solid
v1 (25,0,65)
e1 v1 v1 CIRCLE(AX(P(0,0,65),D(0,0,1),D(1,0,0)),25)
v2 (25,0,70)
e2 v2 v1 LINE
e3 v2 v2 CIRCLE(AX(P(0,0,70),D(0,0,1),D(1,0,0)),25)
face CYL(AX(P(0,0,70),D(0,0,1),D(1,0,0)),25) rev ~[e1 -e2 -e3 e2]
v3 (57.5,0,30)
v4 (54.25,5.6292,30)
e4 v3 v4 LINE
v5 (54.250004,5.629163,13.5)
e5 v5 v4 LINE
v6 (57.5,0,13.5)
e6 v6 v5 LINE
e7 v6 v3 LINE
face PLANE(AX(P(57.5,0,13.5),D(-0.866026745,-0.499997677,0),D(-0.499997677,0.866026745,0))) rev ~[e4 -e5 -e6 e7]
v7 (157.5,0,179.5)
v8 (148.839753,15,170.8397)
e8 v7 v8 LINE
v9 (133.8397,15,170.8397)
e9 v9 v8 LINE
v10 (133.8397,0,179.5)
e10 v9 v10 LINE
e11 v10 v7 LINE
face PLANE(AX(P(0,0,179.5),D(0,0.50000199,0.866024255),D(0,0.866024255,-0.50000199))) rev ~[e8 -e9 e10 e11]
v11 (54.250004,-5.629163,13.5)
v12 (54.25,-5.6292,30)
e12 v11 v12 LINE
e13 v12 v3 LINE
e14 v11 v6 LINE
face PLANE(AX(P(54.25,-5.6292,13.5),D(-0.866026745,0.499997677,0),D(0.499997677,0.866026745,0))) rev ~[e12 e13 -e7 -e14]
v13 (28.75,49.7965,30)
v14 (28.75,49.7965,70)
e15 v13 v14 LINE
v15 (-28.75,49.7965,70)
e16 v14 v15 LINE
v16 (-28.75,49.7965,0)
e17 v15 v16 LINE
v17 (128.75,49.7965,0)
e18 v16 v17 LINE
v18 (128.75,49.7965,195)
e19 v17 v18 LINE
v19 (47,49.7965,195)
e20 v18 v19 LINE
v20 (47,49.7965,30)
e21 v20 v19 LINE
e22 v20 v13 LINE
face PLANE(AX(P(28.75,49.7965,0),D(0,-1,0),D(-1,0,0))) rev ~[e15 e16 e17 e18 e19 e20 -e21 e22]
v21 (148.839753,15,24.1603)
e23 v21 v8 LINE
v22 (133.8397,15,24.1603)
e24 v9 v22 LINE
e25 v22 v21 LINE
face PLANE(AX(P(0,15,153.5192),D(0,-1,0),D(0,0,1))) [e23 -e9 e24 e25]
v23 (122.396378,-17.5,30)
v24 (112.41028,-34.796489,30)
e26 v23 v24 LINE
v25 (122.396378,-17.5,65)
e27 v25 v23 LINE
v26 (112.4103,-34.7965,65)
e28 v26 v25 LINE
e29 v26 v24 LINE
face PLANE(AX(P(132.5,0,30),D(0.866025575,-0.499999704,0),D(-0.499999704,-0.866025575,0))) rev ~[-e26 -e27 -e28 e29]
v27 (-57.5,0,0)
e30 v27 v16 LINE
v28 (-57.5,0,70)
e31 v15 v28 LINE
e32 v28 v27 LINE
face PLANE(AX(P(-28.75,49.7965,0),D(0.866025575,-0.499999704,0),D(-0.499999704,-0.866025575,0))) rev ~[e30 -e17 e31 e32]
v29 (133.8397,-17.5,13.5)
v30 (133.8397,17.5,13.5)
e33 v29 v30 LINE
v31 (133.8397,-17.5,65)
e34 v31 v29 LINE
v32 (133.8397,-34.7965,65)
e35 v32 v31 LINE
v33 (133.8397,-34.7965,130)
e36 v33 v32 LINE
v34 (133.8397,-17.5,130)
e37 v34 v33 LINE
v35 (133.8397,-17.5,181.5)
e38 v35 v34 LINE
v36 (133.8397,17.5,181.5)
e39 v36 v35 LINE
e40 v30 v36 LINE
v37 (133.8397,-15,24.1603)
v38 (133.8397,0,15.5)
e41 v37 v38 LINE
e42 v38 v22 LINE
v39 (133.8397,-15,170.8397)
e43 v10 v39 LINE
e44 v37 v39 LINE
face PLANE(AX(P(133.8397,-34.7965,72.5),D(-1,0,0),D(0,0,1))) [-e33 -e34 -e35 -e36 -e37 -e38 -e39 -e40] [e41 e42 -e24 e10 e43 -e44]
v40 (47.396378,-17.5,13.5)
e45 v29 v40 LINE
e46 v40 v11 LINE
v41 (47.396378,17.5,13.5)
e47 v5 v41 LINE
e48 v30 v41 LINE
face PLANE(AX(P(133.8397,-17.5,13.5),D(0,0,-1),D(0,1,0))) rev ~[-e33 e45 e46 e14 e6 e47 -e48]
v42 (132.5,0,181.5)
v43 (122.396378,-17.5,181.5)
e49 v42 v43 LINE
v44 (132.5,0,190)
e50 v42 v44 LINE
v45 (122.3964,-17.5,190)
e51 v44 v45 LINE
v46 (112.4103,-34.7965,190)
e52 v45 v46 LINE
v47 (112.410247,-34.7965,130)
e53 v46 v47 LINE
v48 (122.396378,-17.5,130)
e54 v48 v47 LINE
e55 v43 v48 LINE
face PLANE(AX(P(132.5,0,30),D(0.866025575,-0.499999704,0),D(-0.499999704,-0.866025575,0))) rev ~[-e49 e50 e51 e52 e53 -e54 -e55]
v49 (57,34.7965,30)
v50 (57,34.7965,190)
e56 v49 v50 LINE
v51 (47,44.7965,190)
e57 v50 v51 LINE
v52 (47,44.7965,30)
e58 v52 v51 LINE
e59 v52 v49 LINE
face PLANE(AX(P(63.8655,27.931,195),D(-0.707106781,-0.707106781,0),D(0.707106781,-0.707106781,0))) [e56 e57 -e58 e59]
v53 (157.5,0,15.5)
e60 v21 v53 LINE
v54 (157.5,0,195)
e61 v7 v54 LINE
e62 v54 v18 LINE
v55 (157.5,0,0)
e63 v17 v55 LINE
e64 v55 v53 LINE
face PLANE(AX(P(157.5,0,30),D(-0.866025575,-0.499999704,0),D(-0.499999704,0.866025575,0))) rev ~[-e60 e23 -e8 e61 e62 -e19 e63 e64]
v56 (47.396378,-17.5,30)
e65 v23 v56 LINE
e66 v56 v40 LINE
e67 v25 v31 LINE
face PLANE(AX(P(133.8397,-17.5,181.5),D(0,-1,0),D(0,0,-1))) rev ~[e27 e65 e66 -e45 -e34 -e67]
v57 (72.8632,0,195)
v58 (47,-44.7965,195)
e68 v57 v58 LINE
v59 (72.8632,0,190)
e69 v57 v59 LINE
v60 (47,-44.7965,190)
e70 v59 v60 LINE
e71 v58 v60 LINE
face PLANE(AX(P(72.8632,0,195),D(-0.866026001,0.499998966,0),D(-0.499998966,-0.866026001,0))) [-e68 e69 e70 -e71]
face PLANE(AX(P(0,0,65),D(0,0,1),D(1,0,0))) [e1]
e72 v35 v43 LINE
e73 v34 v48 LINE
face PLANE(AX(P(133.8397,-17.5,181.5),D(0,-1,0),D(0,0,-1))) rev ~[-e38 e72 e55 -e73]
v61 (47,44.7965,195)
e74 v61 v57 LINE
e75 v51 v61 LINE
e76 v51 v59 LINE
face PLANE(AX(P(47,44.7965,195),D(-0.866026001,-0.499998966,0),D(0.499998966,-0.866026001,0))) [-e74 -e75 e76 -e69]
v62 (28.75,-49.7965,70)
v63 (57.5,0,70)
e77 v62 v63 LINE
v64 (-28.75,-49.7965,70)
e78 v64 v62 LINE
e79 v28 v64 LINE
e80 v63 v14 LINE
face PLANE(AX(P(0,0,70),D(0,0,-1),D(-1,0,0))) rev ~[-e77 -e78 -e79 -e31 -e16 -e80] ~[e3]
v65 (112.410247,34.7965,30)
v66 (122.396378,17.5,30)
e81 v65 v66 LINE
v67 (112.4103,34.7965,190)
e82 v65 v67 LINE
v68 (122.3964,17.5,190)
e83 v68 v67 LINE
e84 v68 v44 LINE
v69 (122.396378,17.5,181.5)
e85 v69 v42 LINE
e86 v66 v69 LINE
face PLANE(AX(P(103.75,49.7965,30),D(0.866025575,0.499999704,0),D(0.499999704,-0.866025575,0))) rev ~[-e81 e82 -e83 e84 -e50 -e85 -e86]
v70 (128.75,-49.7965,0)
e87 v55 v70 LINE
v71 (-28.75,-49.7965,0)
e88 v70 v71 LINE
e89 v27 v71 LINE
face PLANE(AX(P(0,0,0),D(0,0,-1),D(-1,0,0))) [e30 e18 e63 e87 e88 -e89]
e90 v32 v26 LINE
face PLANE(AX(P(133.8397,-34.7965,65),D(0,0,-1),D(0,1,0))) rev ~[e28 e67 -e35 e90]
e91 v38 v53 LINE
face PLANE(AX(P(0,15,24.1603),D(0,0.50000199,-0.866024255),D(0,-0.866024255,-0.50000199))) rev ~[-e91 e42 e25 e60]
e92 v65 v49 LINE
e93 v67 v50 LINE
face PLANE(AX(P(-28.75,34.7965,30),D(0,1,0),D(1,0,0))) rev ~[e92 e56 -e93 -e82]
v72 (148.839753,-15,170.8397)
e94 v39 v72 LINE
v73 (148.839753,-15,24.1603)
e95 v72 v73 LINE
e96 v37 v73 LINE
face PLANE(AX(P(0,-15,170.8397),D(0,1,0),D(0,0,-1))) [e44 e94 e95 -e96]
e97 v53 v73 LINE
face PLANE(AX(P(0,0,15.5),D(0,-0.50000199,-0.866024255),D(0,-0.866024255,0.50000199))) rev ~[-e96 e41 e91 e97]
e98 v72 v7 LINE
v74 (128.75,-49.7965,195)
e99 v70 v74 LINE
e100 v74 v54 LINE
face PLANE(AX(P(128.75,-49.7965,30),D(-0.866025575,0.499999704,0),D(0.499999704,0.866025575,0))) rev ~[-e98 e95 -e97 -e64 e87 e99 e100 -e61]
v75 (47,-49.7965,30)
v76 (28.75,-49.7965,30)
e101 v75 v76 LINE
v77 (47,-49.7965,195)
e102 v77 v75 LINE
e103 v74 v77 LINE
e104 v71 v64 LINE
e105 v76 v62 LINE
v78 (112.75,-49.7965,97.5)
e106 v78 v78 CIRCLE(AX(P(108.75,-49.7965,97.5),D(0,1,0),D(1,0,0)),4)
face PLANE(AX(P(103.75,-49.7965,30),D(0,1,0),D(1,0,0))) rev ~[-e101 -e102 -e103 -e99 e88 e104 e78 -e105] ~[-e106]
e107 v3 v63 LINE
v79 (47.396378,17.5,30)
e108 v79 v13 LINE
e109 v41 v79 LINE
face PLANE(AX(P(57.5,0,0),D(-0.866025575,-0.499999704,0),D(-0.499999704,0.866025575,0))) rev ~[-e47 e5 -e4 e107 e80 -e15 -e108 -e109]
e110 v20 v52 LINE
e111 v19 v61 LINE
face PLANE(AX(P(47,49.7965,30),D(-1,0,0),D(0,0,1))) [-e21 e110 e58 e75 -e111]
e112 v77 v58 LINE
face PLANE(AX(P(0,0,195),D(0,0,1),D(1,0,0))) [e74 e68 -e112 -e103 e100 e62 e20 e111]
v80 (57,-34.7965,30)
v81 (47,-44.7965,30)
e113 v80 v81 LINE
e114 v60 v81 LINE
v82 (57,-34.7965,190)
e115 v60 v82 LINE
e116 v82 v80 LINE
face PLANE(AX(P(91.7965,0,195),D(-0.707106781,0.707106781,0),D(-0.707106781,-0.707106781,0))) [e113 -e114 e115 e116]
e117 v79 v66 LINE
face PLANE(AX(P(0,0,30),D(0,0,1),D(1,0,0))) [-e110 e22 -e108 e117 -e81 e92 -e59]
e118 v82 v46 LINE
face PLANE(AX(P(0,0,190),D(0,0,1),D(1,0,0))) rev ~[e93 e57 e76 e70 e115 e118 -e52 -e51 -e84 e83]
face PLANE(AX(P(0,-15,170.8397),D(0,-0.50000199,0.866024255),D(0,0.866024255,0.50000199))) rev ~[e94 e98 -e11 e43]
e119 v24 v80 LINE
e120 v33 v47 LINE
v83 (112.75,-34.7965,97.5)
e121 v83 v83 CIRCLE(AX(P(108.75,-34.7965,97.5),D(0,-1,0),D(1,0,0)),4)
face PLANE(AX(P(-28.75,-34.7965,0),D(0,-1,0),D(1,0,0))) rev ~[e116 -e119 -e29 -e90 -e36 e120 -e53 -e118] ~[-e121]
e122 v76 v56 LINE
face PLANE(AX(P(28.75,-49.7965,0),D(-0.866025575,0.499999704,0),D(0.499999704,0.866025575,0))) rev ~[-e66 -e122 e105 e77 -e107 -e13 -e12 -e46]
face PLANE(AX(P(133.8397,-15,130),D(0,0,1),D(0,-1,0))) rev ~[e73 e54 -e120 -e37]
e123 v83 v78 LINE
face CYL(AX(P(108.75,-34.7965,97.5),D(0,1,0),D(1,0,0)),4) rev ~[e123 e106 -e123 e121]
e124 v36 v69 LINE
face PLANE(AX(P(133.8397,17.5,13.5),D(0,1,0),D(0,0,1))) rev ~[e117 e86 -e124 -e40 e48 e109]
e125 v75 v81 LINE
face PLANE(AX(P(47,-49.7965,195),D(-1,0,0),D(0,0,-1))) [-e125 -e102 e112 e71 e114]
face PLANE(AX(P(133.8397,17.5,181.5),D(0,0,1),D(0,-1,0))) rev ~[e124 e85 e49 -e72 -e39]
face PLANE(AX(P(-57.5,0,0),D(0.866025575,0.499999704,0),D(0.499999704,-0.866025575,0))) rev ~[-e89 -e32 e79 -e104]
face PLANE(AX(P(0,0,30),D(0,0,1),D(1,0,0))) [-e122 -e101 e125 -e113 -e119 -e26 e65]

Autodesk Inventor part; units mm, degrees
ref_plane "YZ Plane" through (0, 0, 0) normal (1, 0, 0) x (0, 1, 0)
ref_plane "XZ Plane" through (0, 0, 0) normal (0, 1, 0) x (-1, 0, 0)
ref_plane "XY Plane" through (0, 0, 0) normal (0, 0, 1) x (1, 0, 0)
sketch "Sketch7" plane through (0, 0, 0) normal (0, 0, 1) x (1, 0, 0)
  line L0 (-57.5, 0) -> (-28.75, 49.7965)
  line L1 (-28.75, 49.7965) -> (28.75, 49.7965)
  line L2 (28.75, 49.7965) -> (57.5, 0)
  line L3 (57.5, 0) -> (28.75, -49.7965)
  line L4 (28.75, -49.7965) -> (-28.75, -49.7965)
  line L5 (-28.75, -49.7965) -> (-57.5, 0)
  circle A0 centre (0, 0) radius 22.5
  circle A1 centre (-51, 0) radius 2.5
  circle A2 centre (-25.5, -44.1673) radius 2.5
  circle A3 centre (25.5, -44.1673) radius 2.5
  circle A4 centre (51, 0) radius 2.5
  circle A5 centre (25.5, 44.1673) radius 2.5
  circle A6 centre (-25.5, 44.1673) radius 2.5
  line L6 (28.75, 49.7965) -> (157.5, 49.7965)
  line L7 (157.5, 49.7965) -> (157.5, -49.7965)
  line L8 (157.5, -49.7965) -> (28.75, -49.7965)
  dimension "d34" = 115
  dimension "d35" = 45
  dimension "d36" = 5
  dimension "d37" = 51
  dimension "d40" = 360
  dimension "d42" = 100
extrude "Extrusion7" add sketch "Sketch7" along normal blind 30
sketch "Sketch9" plane through (0, 0, 30) normal (0, 0, 1) x (1, 0, 0)
  line L0 (157.5, -49.7965) -> (157.5, 49.7965) projected
  line L1 (157.5, 0) -> (128.75, -49.7965)
  line L2 (128.75, -49.7965) -> (71.25, -49.7965)
  line L3 (71.25, -49.7965) -> (42.5, 0)
  line L4 (42.5, 0) -> (71.25, 49.7965)
  line L5 (71.25, 49.7965) -> (128.75, 49.7965)
  line L6 (128.75, 49.7965) -> (157.5, 0)
  line L7 (157.5, 49.7965) -> (-28.75, 49.7965) projected
  line L8 (-28.75, -49.7965) -> (157.5, -49.7965) projected
  line L9 (128.75, 49.7965) -> (157.5, 49.7965)
  line L10 (157.5, 49.7965) -> (157.5, 0)
  line L11 (157.5, 0) -> (157.5, -49.7965)
  line L12 (157.5, -49.7965) -> (128.75, -49.7965)
  point P0 (0, 0)
  point P1 (100, 0)
  point P2 (100, 49.7965)
  point P3 (100, -49.7965)
extrude "Extrusion8" cut sketch "Sketch9" against normal through all contours L8 L1 L0 | L6 L7 L0
sketch "Sketch10" plane through (0, 0, 30) normal (0, 0, 1) x (1, 0, 0)
  line L0 (157.5, 0) -> (128.75, 49.7965) projected
  line L1 (128.75, -49.7965) -> (157.5, 0) projected
  line L2 (-28.75, -49.7965) -> (128.75, -49.7965) projected
  line L3 (128.75, 49.7965) -> (-28.75, 49.7965) projected
  line L4 (128.75, 49.7965) -> (103.75, 49.7965)
  line L5 (128.75, 49.7965) -> (-28.75, 49.7965) projected
  line L6 (103.75, 49.7965) -> (132.5, 0)
  line L7 (132.5, 0) -> (103.75, -49.7965)
  line L8 (103.75, -49.7965) -> (128.75, -49.7965)
  point P0 (0, 0)
  dimension "d47" = 25
extrude "Extrusion9" add sketch "Sketch10" along normal blind 165
sketch "Sketch11" plane through (0, 0, 0) normal (1, 0, 0) x (0, 1, 0)
  line L0 (15, 179.5) -> (-15, 179.5)
  line L1 (-15, 179.5) -> (-15, 15.5)
  line L2 (-15, 15.5) -> (15, 15.5)
  line L3 (15, 15.5) -> (15, 179.5)
  line L4 (49.7965, 195) -> (49.7965, 0) projected
  line L5 (0, 179.5) -> (15, 170.8397)
  line L6 (15, 170.8397) -> (15, 153.5192)
  line L7 (15, 153.5192) -> (0, 144.859)
  line L8 (0, 144.859) -> (-15, 153.5192)
  line L9 (-15, 153.5192) -> (-15, 170.8397)
  line L10 (-15, 170.8397) -> (0, 179.5)
  line L11 (0, 15.5) -> (-15, 24.1603)
  line L12 (-15, 24.1603) -> (-15, 41.4808)
  line L13 (-15, 41.4808) -> (0, 50.141)
  line L14 (0, 50.141) -> (15, 41.4808)
  line L15 (15, 41.4808) -> (15, 24.1603)
  line L16 (15, 24.1603) -> (0, 15.5)
  line L17 (0, 179.5) -> (15, 179.5)
  line L18 (15, 179.5) -> (15, 170.8397)
  line L19 (0, 179.5) -> (-15, 179.5)
  line L20 (-15, 179.5) -> (-15, 170.8397)
  line L21 (-15, 24.1603) -> (-15, 15.5)
  line L22 (15, 15.5) -> (15, 24.1603)
  line L23 (0, 15.5) -> (15, 15.5)
  point P0 (0, 0)
  point P1 (15, 97.5)
  point P2 (49.7965, 97.5)
  point P3 (0, 195)
  point P4 (0, 162.1795)
  point P5 (0, 32.8205)
  dimension "d50" = 164
  dimension "d51" = 30
extrude "Extrusion10" cut sketch "Sketch11" along normal through all contours L5 L3 L7 L8 L1 L10 | L3 L14 L13 L1 L8 L7 | L3 L16 L11 L1 L13 L14
sketch "Sketch12" plane through (-28.75, -49.7965, 0) normal (0, -1, 0) x (1, 0, 0)
  line L0 (157.5, 72.5) -> (97.5, 72.5)
  line L1 (97.5, 72.5) -> (97.5, 122.5)
  line L2 (97.5, 122.5) -> (157.5, 122.5)
  line L3 (157.5, 122.5) -> (157.5, 72.5)
  line L4 (177.5897, 24.1603) -> (177.5897, 170.8397) projected
  line L5 (157.5, 0) -> (157.5, 195) projected
  point P0 (28.75, 0)
  point P1 (177.5897, 97.5)
  point P2 (157.5, 97.5)
  dimension "d54" = 60
  dimension "d55" = 50
extrude "Extrusion11" add sketch "Sketch12" against normal blind 15
sketch "Sketch13" plane through (-28.75, -34.7965, 0) normal (0, 1, 0) x (1, 0, 0)
  circle A0 centre (137.5, -97.5) radius 4
  line L0 (97.5, -72.5) -> (97.5, -122.5) projected
  line L1 (132.5, -30) -> (132.5, -195) projected
  point P0 (28.75, 0)
  point P1 (97.5, -97.5)
  dimension "d58" = 8
  dimension "d69" = 5
extrude "Extrusion12" cut sketch "Sketch13" against normal through all
sketch "Sketch14" plane through (-28.75, -34.7965, 0) normal (0, 1, 0) x (1, 0, 0)
  arc A0 (141.1603, -95.8868) -> (141.1603, -99.1132) centre (137.5, -97.5) ccw projected
  line L0 (141.1603, -72.5) -> (141.1603, -95.8868) projected
  line L1 (141.1603, -72.5) -> (97.5, -72.5) projected
  line L2 (97.5, -72.5) -> (97.5, -122.5) projected
  line L3 (97.5, -122.5) -> (141.1603, -122.5) projected
  line L4 (141.1603, -72.5) -> (162.5897, -72.5)
  line L5 (162.5897, -72.5) -> (162.5897, -122.5)
  line L6 (162.5897, -122.5) -> (141.1603, -122.5)
  line L7 (141.1603, -122.5) -> (141.1603, -72.5)
  line L8 (177.5897, -170.8397) -> (177.5897, -24.1603) projected
  line L9 (141.1603, -99.1132) -> (141.1603, -122.5) projected
  point P0 (28.75, 0)
  dimension "d62" = 15
extrude "Extrusion13" cut sketch "Sketch14" along normal blind 30 contours L0 L4 L5 L6 L7
sketch "Sketch15" plane through (133.8397, -34.7965, 72.5) normal (-1, 0, 0) x (0, 0, 1)
  line L0 (-59, 52.2965) -> (109, 52.2965)
  line L1 (109, 52.2965) -> (109, 17.2965)
  line L2 (109, 17.2965) -> (-59, 17.2965)
  line L3 (-59, 17.2965) -> (-59, 52.2965)
  line L4 (98.3397, 49.7965) -> (-48.3397, 49.7965) projected
  point P0 (-72.5, 34.7965)
  point P1 (-57, 34.7965)
  point P2 (-59, 34.7965)
  point P3 (25, 49.7965)
  point P4 (25, 52.2965)
  dimension "d65" = 168
  dimension "d66" = 35
extrude "Extrusion14" cut sketch "Sketch15" along normal blind 125
sketch "Sketch17" plane through (-28.75, 49.7965, 30) normal (0, 1, 0) x (1, 0, 0)
  line L0 (132.5, -165) -> (157.5, -165) projected
  line L1 (0.75, 30) -> (5.75, 30) projected
  line L2 (157.5, -165) -> (0.75, -165)
  line L3 (0.75, -165) -> (0.75, 30)
  line L4 (0.75, 30) -> (157.5, 30)
  line L5 (157.5, 30) -> (157.5, -165)
  point P0 (28.75, 30)
extrude "Extrusion15" add sketch "Sketch17" against normal blind 15
sketch "Sketch18" plane through (103.75, -49.7965, 72.5) normal (0, 0, -1) x (-1, 0, 0)
  line L0 (0, 0) -> (-8.6603, 15) projected
  line L1 (0, 0) -> (35, 0) projected
  line L2 (35, 0) -> (35, 15) projected
  line L3 (-8.6603, 15) -> (35, 15) projected
  point P0 (103.75, 49.7965)
extrude "Extrusion16" add sketch "Sketch18" along normal blind 50
sketch "Sketch20" plane through (-28.75, 49.7965, 30) normal (0, 1, 0) x (1, 0, 0)
  line L0 (5.75, 0) -> (0.75, 0) projected
  line L1 (141.1603, -165) -> (0.75, -165) projected
  line L2 (0.75, 0) -> (75.75, 0)
  line L3 (75.75, 0) -> (75.75, -165)
  line L4 (75.75, -165) -> (0.75, -165)
  line L5 (0.75, -165) -> (0.75, 0)
  line L6 (157.5, -165) -> (0.75, -165) projected
  point P0 (28.75, 30)
  dimension "d76" = 75
extrude "Extrusion18" cut sketch "Sketch20" against normal through all
chamfer "Chamfer1" distance 10 angle 45 1 edges at (47, 34.7965, 112.5)
sketch "Sketch22" plane through (-28.75, -49.7965, 0) normal (0, -1, 0) x (1, 0, 0)
  line L0 (75.75, 195) -> (75.75, 30) projected
  line L1 (157.5, 195) -> (75.75, 195) projected
  line L2 (0, 0) -> (157.5, 0) projected
  line L3 (75.75, 195) -> (157.5, 195)
  line L4 (157.5, 195) -> (157.5, 0)
  line L5 (157.5, 0) -> (75.75, 0)
  line L6 (75.75, 0) -> (75.75, 195)
  circle A0 centre (137.5, 97.5) radius 4 projected
  point P0 (28.75, 0)
extrude "Extrusion19" add sketch "Sketch22" against normal blind 15
chamfer "Chamfer2" distance 10 angle 45 1 edges at (47, -34.7965, 112.5)
sketch "Sketch32" plane through (0, 0, 0) normal (0, 0, -1) x (-1, 0, 0)
  circle A0 centre (0, 0) radius 22.5 projected
  circle A1 centre (25.5, -44.1673) radius 2.5 projected
  circle A2 centre (25.5, -44.1673) radius 2.5
  circle A3 centre (51, 0) radius 2.5
  circle A4 centre (25.5, 44.1673) radius 2.5
  circle A5 centre (-25.5, 44.1673) radius 2.5
  circle A6 centre (-51, 0) radius 2.5
  circle A7 centre (-25.5, -44.1673) radius 2.5
  dimension "d107" = 360
extrude "Extrusion27" add sketch "Sketch32" against normal blind 5 contours A0
extrude "Extrusion28" cut sketch "Sketch32" against normal through all contours A1 | A3 | A4 | A5 | A6 | A7
sketch "Sketch33" plane through (0, 0, 195) normal (0, 0, 1) x (1, 0, 0)
  line L0 (47, -44.7965) -> (57, -34.7965) projected
  line L1 (57, 34.7965) -> (47, 44.7965) projected
  line L2 (57, 34.7965) -> (63.8655, 27.931)
  line L3 (63.8655, 27.931) -> (91.7965, 0)
  line L4 (57, -34.7965) -> (47, -44.7965) projected
  line L5 (91.7965, 0) -> (57, -34.7965)
  line L6 (57, -34.7965) -> (112.4103, -34.7965) projected
  line L7 (122.3964, 17.5) -> (132.5, 0) projected
  line L8 (132.5, 0) -> (122.3964, -17.5) projected
  line L9 (112.4103, 34.7965) -> (57, 34.7965) projected
  line L10 (133.8397, -34.7965) -> (112.4103, -34.7965) projected
  line L11 (57, -34.7965) -> (112.4103, -34.7965)
  line L12 (122.3964, 17.5) -> (112.4103, 34.7965) projected
  line L13 (47, 44.7965) -> (57, 34.7965) projected
  line L14 (112.4103, 34.7965) -> (57, 34.7965)
  line L15 (132.5, 0) -> (112.4103, 34.7965)
  line L16 (132.5, 0) -> (112.4103, -34.7965)
extrude "Extrusion29" add sketch "Sketch33" against normal blind 5
sketch "Sketch34" plane through (0, 0, 195) normal (0, 0, 1) x (1, 0, 0)
  line L0 (72.8632, 0) -> (47, -44.7965)
  line L1 (47, -44.7965) -> (-4.7265, -44.7965)
  line L2 (-4.7265, -44.7965) -> (-30.5897, 0)
  line L3 (-30.5897, 0) -> (-4.7265, 44.7965)
  line L4 (-4.7265, 44.7965) -> (47, 44.7965)
  line L5 (47, 44.7965) -> (72.8632, 0)
  line L6 (47, -49.7965) -> (47, -44.7965) projected
  line L7 (47, 49.7965) -> (47, 44.7965) projected
  line L8 (91.7965, 0) -> (47, 44.7965) projected
  line L9 (47, -44.7965) -> (91.7965, 0) projected
  point P0 (0, 0)
  point P1 (21.1368, 0)
extrude "Extrusion30" add sketch "Sketch34" against normal blind 5 contours L5 L8 L9 L0
sketch "Sketch35" plane through (0, 0, 0) normal (0, 0, -1) x (-1, 0, 0)
  circle A0 centre (0, 0) radius 22.5 construction
  circle A1 centre (51, 0) radius 2.5 construction
  circle A2 centre (51, 0) radius 6.5
  circle A3 centre (25.5, 44.1673) radius 6.5
  circle A4 centre (-25.5, 44.1673) radius 6.5
  circle A5 centre (-51, 0) radius 6.5
  circle A6 centre (-25.5, -44.1673) radius 6.5
  circle A7 centre (25.5, -44.1673) radius 6.5
  dimension "d117" = 13
  dimension "d120" = 360
extrude "Extrusion31" cut sketch "Sketch35" against normal blind 15
sketch "Sketch36" plane through (0, 0, 195) normal (0, 0, 1) x (1, 0, 0)
  line L0 (77.8632, 9) -> (87.8632, 9)
  line L1 (87.8632, 9) -> (87.8632, -9)
  line L2 (87.8632, -9) -> (77.8632, -9)
  line L3 (77.8632, -9) -> (77.8632, 9)
  point P0 (0, 0)
  point P1 (72.8632, 0)
  point P2 (77.8632, 0)
  dimension "d124" = 10
  dimension "d125" = 18
  dimension "d129" = 5
extrude "Extrusion32" cut sketch "Sketch36" against normal blind 10
sketch "Sketch37" plane through (133.8397, -34.7965, 72.5) normal (-1, 0, 0) x (0, 0, 1)
  line L0 (-7.5, 19.7965) -> (57.5, 19.7965)
  line L1 (57.5, 19.7965) -> (57.5, 0)
  line L2 (57.5, 0) -> (-7.5, 0)
  line L3 (-7.5, 0) -> (-7.5, 19.7965)
  line L4 (21, 0) -> (29, 0) projected
  line L5 (-48.3397, 19.7965) -> (98.3397, 19.7965) projected
  point P0 (-72.5, 34.7965)
  point P1 (25, 0)
  dimension "d130" = 65
extrude "Extrusion33" cut sketch "Sketch37" along normal through all
sketch "Sketch38" plane through (0, 0, 195) normal (0, 0, 1) x (1, 0, 0)
  line L0 (77.8632, -9) -> (77.8632, 9) projected
  line L1 (87.8632, 9) -> (87.8632, -9) projected
  line L2 (77.8632, 9) -> (87.8632, 9) projected
  line L3 (87.8632, -9) -> (77.8632, -9) projected
  point P0 (0, 0)
extrude "Extrusion34" add sketch "Sketch38" against normal blind 5
sketch "Sketch40" plane through (0, 0, 0) normal (0, 0, -1) x (-1, 0, 0)
  line L0 (57.5, 0) -> (28.75, -49.7965) projected
  line L1 (57.5, 0) -> (28.75, -49.7965)
  line L2 (28.75, -49.7965) -> (-28.75, -49.7965)
  line L3 (-28.75, -49.7965) -> (-57.5, 0)
  line L4 (-57.5, 0) -> (-28.75, 49.7965)
  line L5 (-28.75, 49.7965) -> (28.75, 49.7965)
  line L6 (28.75, 49.7965) -> (57.5, 0)
  point P0 (0, 0)
  point P1 (0, 0)
extrude "Extrusion35" add sketch "Sketch40" against normal blind 70
sketch "Sketch42" plane through (0, 0, 0) normal (0, 0, -1) x (-1, 0, 0)
  arc A0 (-28.75, 49.7965) -> (-32, 44.1673) centre (-25.5, 44.1673) ccw projected
  line L0 (-32, 44.1673) -> (-28.75, 49.7965) projected
  arc A1 (-28.75, 49.7965) -> (-32, 44.1673) centre (-25.5, 44.1673) ccw projected
  line L1 (-128.75, 49.7965) -> (-28.75, 49.7965) construction
  line L2 (-128.75, 49.7965) -> (-157.5, 0) projected
  line L3 (-157.5, 0) -> (-128.75, -49.7965) projected
  line L4 (-28.75, -49.7965) -> (-128.75, -49.7965) projected
  arc A2 (-32, -44.1673) -> (-28.75, -49.7965) centre (-25.5, -44.1673) ccw projected
  line L5 (-28.75, -49.7965) -> (-32, -44.1673) projected
  line L6 (28.75, -49.7965) -> (-28.75, -49.7965) projected
  line L7 (57.5, 0) -> (28.75, -49.7965) projected
  line L8 (28.75, 49.7965) -> (57.5, 0) projected
  line L9 (-28.75, 49.7965) -> (28.75, 49.7965) projected
  line L10 (-32, 44.1673) -> (-28.75, 49.7965) projected
  line L11 (-57.5, 0) -> (-54.25, 5.6292) projected
  line L12 (-54.25, -5.6292) -> (-57.5, 0) projected
  arc A3 (-57.5, 0) -> (-54.25, -5.6292) centre (-51, 0) ccw projected
  arc A4 (-54.25, 5.6292) -> (-57.5, 0) centre (-51, 0) ccw projected
  point P0 (0, 0)
extrude "Extrusion37" add sketch "Sketch42" against normal blind 30
sketch "Sketch43" plane through (133.8397, -17.5, 13.5) normal (0, 0, 1) x (1, 0, 0)
  line L0 (-76.3397, 17.5) -> (-79.5897, 23.1292) projected
  arc A0 (-76.3397, 17.5) -> (-79.5897, 23.1292) centre (-82.8397, 17.5) ccw projected
  line L1 (-76.3397, 17.5) -> (-79.5897, 23.1292) projected
  arc A1 (-79.5897, 11.8708) -> (-76.3397, 17.5) centre (-82.8397, 17.5) ccw projected
  line L2 (-79.5897, 11.8708) -> (-76.3397, 17.5) projected
  point P0 (-133.8397, 17.5)
extrude "Extrusion38" cut sketch "Sketch43" along normal through all
sketch "Sketch44" plane through (0, 0, 70) normal (0, 0, 1) x (1, 0, 0)
  circle A0 centre (0, 0) radius 25
  dimension "d143" = 50
extrude "Extrusion39" cut sketch "Sketch44" against normal blind 5
properties part number "HA08" material "ABS Plastic"
